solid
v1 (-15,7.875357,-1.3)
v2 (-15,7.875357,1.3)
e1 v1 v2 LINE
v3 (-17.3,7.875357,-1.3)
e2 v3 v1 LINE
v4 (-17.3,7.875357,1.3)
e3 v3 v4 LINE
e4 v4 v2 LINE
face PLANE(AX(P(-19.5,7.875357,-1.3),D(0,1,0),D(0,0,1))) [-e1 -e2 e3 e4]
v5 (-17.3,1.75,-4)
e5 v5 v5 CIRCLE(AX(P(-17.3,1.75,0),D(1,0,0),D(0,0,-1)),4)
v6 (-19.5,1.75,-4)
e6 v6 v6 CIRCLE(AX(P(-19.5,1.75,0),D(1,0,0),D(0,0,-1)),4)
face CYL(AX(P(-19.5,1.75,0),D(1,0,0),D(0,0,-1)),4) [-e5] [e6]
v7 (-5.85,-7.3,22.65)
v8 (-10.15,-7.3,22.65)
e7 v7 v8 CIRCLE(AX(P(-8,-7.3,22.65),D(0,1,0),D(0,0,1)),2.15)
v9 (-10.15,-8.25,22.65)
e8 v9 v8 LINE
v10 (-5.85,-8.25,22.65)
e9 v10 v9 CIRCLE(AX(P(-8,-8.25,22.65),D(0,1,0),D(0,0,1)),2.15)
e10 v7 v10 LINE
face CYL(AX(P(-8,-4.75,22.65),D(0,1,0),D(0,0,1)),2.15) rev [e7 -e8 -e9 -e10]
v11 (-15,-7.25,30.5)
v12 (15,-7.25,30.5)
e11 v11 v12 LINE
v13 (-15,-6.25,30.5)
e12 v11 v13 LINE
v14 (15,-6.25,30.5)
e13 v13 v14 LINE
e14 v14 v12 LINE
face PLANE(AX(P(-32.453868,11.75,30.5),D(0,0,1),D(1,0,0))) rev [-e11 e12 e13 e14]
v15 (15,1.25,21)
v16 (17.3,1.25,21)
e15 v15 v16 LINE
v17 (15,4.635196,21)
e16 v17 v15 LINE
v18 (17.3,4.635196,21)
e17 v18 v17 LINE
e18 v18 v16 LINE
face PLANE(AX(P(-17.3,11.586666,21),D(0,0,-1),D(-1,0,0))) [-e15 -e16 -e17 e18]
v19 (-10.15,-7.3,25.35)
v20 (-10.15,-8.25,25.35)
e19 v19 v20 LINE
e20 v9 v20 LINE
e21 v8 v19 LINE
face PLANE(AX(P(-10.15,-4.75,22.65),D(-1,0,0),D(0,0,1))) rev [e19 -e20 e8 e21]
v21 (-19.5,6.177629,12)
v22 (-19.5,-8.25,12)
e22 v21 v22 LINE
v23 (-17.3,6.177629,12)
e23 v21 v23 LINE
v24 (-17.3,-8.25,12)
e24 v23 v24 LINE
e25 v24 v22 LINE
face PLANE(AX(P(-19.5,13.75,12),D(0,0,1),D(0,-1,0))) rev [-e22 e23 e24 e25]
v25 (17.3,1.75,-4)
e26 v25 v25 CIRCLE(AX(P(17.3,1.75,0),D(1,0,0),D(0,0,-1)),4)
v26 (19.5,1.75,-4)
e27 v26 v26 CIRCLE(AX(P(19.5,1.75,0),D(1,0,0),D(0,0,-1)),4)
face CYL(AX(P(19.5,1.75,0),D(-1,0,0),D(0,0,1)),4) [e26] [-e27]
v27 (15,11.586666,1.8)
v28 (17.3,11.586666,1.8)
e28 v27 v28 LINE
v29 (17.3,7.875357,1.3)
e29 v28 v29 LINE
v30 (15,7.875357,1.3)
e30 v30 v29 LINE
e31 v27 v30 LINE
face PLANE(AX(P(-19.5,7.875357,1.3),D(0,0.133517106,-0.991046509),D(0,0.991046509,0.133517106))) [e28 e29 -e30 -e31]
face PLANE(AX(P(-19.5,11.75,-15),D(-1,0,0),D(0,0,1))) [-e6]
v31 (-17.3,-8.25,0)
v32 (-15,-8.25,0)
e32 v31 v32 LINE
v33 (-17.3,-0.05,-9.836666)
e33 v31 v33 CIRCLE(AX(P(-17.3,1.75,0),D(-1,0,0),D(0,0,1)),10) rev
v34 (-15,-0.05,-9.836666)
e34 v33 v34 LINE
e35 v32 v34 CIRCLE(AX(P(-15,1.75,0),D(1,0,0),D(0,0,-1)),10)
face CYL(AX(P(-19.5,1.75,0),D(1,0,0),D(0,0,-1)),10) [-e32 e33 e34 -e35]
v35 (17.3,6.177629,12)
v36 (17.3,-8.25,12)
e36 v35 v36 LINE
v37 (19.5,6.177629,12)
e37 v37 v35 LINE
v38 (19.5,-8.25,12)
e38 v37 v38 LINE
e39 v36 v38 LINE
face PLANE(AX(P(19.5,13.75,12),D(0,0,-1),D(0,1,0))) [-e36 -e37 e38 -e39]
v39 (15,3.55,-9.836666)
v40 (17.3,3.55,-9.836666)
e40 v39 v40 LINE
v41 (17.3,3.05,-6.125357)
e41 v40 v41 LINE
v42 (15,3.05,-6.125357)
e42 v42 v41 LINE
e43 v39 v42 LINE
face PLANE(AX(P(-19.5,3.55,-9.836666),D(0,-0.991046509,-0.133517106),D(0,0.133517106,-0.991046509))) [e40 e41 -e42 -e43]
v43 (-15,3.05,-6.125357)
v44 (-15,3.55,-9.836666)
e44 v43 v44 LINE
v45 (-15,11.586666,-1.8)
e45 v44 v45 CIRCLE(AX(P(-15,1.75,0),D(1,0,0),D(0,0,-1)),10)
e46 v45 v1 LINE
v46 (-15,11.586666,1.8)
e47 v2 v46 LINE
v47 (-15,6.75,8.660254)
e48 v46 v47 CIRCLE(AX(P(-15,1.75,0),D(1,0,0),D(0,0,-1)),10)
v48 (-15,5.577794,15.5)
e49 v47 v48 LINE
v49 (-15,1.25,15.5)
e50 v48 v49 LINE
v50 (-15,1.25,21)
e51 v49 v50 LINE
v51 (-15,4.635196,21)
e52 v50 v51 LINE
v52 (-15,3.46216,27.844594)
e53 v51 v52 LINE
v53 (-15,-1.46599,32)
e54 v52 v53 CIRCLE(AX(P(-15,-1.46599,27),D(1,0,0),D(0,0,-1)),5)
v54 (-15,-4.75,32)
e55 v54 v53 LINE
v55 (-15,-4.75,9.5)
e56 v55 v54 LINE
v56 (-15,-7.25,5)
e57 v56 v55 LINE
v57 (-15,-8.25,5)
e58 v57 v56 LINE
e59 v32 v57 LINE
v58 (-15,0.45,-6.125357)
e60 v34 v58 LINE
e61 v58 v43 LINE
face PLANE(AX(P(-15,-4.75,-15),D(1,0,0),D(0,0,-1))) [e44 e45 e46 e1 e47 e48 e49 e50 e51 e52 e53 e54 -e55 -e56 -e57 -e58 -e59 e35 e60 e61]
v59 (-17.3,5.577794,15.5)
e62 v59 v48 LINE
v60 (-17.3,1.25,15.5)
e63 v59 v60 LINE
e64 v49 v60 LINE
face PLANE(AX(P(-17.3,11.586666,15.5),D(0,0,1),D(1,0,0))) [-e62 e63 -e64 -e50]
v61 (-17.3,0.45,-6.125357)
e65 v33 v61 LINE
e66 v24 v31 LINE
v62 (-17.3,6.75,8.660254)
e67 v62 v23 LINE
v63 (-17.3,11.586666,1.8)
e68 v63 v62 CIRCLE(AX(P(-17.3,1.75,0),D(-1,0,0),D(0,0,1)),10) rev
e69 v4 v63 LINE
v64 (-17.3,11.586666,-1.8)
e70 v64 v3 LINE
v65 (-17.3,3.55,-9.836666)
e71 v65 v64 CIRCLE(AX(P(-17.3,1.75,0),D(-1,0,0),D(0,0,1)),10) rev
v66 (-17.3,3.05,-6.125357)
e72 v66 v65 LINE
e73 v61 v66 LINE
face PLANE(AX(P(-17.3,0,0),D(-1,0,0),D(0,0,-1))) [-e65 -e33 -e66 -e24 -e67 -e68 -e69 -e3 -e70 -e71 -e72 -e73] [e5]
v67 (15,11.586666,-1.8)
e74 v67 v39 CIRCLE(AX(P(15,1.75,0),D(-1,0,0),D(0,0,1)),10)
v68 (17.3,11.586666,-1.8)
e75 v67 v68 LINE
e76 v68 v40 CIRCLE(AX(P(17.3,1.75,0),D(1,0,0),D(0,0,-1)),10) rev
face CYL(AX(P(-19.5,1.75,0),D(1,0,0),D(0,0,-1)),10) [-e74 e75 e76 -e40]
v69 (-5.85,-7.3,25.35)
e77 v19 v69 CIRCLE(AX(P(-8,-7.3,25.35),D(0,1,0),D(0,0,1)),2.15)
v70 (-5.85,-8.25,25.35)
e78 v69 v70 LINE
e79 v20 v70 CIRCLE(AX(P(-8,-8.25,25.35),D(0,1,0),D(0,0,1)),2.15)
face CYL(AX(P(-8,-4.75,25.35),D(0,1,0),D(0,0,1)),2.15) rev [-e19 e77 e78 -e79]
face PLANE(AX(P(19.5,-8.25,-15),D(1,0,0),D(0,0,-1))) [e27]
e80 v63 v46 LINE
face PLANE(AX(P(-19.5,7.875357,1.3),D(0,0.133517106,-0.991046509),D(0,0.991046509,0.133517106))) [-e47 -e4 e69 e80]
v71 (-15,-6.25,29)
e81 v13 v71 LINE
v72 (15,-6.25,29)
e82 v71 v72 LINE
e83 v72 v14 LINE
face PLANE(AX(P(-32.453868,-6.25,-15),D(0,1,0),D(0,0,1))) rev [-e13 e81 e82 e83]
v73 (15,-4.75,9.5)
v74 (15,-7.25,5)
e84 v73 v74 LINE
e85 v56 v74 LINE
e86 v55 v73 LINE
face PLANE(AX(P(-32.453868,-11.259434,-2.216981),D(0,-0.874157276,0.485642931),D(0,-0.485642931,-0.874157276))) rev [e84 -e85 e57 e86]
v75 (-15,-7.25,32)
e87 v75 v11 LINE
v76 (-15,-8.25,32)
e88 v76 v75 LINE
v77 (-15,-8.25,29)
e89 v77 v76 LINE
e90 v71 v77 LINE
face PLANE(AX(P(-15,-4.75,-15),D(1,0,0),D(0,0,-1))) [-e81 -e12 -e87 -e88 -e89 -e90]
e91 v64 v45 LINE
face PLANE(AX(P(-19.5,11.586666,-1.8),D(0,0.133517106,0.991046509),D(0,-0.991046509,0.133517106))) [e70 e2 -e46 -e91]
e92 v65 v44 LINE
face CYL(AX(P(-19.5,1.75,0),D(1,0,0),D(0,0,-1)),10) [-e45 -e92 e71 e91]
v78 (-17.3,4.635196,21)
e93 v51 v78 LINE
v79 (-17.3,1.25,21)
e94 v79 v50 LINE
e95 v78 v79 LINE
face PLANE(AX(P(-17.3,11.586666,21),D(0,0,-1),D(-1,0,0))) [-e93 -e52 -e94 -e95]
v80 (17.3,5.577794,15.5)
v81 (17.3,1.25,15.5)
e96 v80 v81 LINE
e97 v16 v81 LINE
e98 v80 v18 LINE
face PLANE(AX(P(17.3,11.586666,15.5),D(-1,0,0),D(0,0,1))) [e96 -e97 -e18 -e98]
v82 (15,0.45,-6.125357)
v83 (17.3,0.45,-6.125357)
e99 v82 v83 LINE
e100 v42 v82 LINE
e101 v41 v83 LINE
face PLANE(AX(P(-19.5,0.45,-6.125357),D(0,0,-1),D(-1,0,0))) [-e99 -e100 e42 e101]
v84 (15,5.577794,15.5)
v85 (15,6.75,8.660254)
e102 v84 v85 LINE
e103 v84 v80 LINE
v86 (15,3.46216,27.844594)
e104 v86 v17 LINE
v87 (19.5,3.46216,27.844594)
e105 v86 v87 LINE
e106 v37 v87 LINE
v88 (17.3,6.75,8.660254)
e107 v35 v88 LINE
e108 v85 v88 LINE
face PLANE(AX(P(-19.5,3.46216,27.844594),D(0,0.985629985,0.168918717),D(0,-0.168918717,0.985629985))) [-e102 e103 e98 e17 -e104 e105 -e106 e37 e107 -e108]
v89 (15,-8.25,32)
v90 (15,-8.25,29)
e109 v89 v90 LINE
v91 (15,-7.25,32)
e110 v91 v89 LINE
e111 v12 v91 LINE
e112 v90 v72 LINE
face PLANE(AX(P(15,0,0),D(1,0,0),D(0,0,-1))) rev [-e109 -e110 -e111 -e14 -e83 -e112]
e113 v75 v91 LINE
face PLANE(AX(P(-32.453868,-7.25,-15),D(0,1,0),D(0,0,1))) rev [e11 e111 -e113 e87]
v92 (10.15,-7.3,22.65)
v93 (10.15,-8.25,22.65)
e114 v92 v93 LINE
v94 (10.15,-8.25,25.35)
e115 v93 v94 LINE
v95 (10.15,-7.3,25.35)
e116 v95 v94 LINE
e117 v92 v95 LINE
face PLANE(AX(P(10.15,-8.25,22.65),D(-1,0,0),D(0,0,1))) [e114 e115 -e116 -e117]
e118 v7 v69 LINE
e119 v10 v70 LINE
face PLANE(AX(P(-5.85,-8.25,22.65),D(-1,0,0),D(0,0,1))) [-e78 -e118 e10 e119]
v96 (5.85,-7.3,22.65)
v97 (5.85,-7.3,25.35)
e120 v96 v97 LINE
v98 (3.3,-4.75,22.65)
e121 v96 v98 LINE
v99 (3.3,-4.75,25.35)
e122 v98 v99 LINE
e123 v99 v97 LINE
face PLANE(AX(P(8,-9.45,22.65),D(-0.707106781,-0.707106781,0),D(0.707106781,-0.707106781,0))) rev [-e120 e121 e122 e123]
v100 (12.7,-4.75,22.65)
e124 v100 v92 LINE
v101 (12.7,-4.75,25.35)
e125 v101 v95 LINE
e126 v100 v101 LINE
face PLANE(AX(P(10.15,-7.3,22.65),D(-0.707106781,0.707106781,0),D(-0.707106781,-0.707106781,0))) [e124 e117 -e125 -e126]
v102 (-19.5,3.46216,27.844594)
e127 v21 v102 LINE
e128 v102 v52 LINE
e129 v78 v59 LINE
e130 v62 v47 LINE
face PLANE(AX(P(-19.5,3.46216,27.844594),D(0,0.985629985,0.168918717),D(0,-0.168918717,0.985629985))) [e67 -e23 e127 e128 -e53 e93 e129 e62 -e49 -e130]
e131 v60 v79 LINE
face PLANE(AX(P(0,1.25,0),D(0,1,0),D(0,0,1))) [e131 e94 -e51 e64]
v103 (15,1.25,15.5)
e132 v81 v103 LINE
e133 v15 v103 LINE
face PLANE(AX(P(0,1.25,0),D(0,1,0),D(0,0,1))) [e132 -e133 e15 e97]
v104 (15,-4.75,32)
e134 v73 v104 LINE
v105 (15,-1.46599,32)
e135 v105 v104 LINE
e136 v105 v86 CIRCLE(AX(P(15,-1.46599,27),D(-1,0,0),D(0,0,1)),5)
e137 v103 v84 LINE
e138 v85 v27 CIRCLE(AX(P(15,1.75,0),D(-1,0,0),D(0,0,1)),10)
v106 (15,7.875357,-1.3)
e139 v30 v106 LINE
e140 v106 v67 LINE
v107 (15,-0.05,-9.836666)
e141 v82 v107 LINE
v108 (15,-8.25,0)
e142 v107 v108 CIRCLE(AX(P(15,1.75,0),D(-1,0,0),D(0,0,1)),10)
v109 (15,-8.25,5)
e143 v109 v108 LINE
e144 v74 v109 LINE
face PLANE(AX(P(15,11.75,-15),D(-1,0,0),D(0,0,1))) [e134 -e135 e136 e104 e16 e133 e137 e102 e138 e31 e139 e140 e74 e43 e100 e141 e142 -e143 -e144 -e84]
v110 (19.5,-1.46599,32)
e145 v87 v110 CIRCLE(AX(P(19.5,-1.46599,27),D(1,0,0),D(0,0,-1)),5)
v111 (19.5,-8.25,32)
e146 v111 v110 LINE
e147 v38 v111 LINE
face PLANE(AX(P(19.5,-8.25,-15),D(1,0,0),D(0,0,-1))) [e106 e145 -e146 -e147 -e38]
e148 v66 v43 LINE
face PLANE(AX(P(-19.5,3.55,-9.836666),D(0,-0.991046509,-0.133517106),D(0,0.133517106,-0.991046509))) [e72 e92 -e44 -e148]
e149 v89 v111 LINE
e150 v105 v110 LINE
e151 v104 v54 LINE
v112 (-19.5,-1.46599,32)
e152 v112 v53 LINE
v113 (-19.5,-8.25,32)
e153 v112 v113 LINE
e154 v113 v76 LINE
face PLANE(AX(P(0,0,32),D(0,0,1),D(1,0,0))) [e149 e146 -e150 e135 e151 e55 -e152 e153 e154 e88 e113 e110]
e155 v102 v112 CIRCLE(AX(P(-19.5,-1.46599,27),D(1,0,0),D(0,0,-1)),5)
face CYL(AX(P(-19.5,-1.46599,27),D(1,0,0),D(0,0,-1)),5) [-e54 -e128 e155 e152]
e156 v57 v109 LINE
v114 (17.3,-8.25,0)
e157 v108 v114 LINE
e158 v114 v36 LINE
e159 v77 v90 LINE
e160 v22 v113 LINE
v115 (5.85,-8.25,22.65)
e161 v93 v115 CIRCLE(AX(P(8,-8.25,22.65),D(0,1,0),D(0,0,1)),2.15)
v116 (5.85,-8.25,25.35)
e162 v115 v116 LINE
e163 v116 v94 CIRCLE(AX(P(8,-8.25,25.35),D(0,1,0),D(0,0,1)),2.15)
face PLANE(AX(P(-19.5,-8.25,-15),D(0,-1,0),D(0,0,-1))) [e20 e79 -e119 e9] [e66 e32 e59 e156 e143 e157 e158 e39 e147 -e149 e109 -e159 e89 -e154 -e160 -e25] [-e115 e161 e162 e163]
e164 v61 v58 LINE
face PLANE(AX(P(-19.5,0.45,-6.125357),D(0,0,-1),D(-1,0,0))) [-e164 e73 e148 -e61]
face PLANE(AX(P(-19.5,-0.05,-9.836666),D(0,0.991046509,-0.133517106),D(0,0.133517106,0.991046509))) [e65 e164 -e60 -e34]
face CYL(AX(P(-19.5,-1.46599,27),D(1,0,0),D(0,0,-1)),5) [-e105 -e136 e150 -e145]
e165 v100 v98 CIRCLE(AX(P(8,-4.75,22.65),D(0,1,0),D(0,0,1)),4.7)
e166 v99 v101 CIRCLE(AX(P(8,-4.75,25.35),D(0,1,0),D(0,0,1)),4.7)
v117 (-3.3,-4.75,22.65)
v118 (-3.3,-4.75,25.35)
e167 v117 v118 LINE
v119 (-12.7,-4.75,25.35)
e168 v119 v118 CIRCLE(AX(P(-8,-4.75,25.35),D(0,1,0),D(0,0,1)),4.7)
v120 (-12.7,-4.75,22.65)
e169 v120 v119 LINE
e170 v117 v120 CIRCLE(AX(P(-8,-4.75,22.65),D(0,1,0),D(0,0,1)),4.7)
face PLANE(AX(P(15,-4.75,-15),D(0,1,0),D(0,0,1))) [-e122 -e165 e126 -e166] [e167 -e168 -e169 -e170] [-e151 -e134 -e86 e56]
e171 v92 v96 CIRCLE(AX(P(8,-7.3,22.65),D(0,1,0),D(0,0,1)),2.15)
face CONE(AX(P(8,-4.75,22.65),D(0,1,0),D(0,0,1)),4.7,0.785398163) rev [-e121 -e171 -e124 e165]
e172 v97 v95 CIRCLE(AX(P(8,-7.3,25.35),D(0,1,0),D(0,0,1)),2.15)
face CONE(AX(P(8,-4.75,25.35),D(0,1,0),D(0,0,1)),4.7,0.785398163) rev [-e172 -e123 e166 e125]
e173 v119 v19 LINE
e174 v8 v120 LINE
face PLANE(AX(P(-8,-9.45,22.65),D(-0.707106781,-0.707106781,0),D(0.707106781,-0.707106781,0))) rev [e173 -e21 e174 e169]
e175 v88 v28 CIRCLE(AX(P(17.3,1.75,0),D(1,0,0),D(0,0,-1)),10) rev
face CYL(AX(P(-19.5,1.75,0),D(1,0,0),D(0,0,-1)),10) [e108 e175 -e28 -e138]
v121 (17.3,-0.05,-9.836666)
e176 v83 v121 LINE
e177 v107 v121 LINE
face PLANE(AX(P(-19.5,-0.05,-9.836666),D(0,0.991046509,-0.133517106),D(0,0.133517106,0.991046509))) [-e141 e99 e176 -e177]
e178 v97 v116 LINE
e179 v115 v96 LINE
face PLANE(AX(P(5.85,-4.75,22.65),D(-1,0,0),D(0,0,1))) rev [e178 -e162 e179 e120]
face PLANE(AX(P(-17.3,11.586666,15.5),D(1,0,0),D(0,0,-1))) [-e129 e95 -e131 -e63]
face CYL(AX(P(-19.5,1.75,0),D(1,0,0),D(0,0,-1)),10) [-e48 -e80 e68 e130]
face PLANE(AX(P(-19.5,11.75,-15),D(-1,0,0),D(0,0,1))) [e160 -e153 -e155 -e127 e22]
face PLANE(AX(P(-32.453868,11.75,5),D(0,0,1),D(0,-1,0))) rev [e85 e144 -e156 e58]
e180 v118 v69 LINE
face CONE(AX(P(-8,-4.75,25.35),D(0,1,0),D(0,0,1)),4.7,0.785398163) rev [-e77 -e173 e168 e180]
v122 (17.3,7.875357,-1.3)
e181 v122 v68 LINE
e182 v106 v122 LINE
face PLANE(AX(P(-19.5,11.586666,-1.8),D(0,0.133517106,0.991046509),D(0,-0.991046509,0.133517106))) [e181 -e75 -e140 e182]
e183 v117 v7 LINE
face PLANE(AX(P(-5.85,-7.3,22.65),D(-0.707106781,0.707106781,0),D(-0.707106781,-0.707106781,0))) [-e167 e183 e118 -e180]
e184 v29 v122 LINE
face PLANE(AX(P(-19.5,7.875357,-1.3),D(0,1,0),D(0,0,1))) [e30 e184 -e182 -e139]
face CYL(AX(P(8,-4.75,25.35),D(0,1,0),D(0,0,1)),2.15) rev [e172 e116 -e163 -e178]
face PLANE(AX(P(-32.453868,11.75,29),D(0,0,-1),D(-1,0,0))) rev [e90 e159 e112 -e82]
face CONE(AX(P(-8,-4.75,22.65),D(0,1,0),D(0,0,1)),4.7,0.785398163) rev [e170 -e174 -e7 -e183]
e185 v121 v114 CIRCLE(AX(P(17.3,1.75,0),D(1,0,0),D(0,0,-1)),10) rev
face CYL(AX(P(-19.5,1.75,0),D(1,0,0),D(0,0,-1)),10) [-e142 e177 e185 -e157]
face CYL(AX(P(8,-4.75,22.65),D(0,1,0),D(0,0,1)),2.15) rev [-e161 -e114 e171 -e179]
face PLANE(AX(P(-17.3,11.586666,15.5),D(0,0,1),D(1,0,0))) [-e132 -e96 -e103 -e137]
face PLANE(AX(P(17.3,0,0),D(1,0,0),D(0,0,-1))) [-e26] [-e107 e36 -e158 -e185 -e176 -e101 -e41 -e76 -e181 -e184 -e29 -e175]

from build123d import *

# Parameters (mm, degrees)
BODY_DEPTH                                       = 32
BODY_DEPTH_BACK                                  = 15
PIVOT_START                                      = 15
PIVOT_PIN_R_SKETCH_R                             = 4
PIVOT_PIN_R_DEPTH                                = 4.25
OUTSIDE_SHAPE_CUT_OUT_DEPTH                      = 40.272286666
OUTSIDE_SHAPE_CUT_OUT_DEPTH_BACK                 = 40.272286666
OUTSIDE_SHAPE_CUT_OUT_SKETCH_W                   = 49
OUTSIDE_SHAPE_CUT_OUT_SKETCH_H                   = 22
OUTSIDE_START                                    = 17.3
OUTSIDE_SHAPE_CUT_OUT_SKETCH_R_W                 = 24
OUTSIDE_SHAPE_CUT_OUT_SKETCH_R_H                 = 24
OUTSIDE_SHAPE_CUT_OUT_SKETCH_R_R                 = 4
OUTSIDE_SHAPE_CUT_OUT_R_DEPTH                    = 22.923727913
INSIDE_START                                     = 15
INSIDE_SHAPE_CUT_OUT_DEPTH                       = 30
LIGHTENING_START                                 = 1.25
LIGHTENING_2_SKETCH_W                            = 34.6
LIGHTENING_2_SKETCH_H                            = 5.5
LIGHTENING_2_DEPTH                               = 38.973727913
F_2_START                                        = -8.25
F_2_LATERAL_SLOTS_ORIENTATED_LONGITUDINALL_DEPTH = 3.5


with BuildPart() as part:
    # Profile Sketch → Body (new, two sides: drawn at the far end of the back side and taken through both)
    with BuildSketch(Plane.XY.offset(-BODY_DEPTH_BACK)):
        Polygon((-19.5, -8.25), (19.5, -8.25), (19.5, 11.75), (15, 11.75), (15, -4.75), (-15, -4.75), (-15, 11.75), (-19.5, 11.75), align=None)
    extrude(amount=BODY_DEPTH + BODY_DEPTH_BACK)

    # Pivot Pin R Sketch → Pivot Pin R (add)
    with BuildSketch(Plane(origin=(0, 0, 0), x_dir=(0, 0, -1), z_dir=(1, 0, 0)).offset(PIVOT_START)):
        with Locations((0, 1.75)):
            Circle(PIVOT_PIN_R_SKETCH_R)
    pivot_pin_r = extrude(amount=PIVOT_PIN_R_DEPTH)

    # Pivot Pin L: Pivot Pin R across plane
    add(pivot_pin_r.mirror(Plane(origin=(0, 0, 0), x_dir=(0, 0, 1), z_dir=(1, 0, 0))))

    # Outside Shape Cut Out Sketch → Outside Shape Cut Out (cut, two sides: drawn at the far end of the back side and taken through both)
    with BuildSketch(Plane(origin=(0, 0, 0), x_dir=(0, 0, -1), z_dir=(1, 0, 0)).offset(-OUTSIDE_SHAPE_CUT_OUT_DEPTH_BACK)):
        with Locations((-9.5, 0.75)):
            Rectangle(OUTSIDE_SHAPE_CUT_OUT_SKETCH_W, OUTSIDE_SHAPE_CUT_OUT_SKETCH_H)
        with BuildLine():
            Line((-27.844593584, 3.462159665), (-8.660254038, 6.75))
            ThreePointArc((-8.660254038, 6.75), (-5.762166553, 9.922969878), (-1.8, 11.586666102))
            Line((-1.8, 11.586666102), (-1.3, 7.87535696))
            Line((-1.3, 7.87535696), (1.3, 7.87535696))
            Line((1.3, 7.87535696), (1.8, 11.586666102))
            ThreePointArc((1.8, 11.586666102), (7.071067812, 8.821067812), (9.836666102, 3.55))
            Line((9.836666102, 3.55), (6.12535696, 3.05))
            Line((6.12535696, 3.05), (6.12535696, 0.45))
            Line((6.12535696, 0.45), (9.836666102, -0.05))
            ThreePointArc((9.836666102, -0.05), (6.403124237, -5.931145748), (0, -8.25))
            Line((0, -8.25), (-32, -8.25))
            Line((-32, -8.25), (-32, -1.46599026))
            ThreePointArc((-32, -1.46599026), (-30.822497084, 1.757131835), (-27.844593584, 3.462159665))
        make_face(mode=Mode.SUBTRACT)
    extrude(amount=OUTSIDE_SHAPE_CUT_OUT_DEPTH + OUTSIDE_SHAPE_CUT_OUT_DEPTH_BACK, mode=Mode.SUBTRACT)

    # Outside Shape Cut Out Sketch R → Outside Shape Cut Out R (cut, through all)
    with BuildSketch(Plane(origin=(0, 0, 0), x_dir=(0, 0, -1), z_dir=(1, 0, 0)).offset(OUTSIDE_START)):
        with Locations((0, 1.75)):
            Rectangle(OUTSIDE_SHAPE_CUT_OUT_SKETCH_R_W, OUTSIDE_SHAPE_CUT_OUT_SKETCH_R_H)
        with Locations((0, 1.75)):
            Circle(OUTSIDE_SHAPE_CUT_OUT_SKETCH_R_R, mode=Mode.SUBTRACT)
    outside_shape_cut_out_r = extrude(amount=OUTSIDE_SHAPE_CUT_OUT_R_DEPTH, mode=Mode.SUBTRACT)

    # Outside Shape Cut Out L: Outside Shape Cut Out R across plane
    add(outside_shape_cut_out_r.mirror(Plane(origin=(0, 0, 0), x_dir=(0, 0, 1), z_dir=(1, 0, 0))), mode=Mode.SUBTRACT)

    # Inside Shape Cut Out Sketch → Inside Shape Cut Out (cut)
    with BuildSketch(Plane(origin=(0, 0, 0), x_dir=(0, 0, -1), z_dir=(1, 0, 0)).offset(INSIDE_START)):
        Polygon((-29, -6.25), (-29, -8.25), (-32, -8.25), (-32, -7.25), (-30.5, -7.25), (-30.5, -6.25), align=None)
        Polygon((-9.5, -4.75), (-5, -7.25), (-5, -8.25), (7.599342077, -8.25), (7.599342077, -4.75), align=None)
    extrude(amount=-INSIDE_SHAPE_CUT_OUT_DEPTH, mode=Mode.SUBTRACT)

    # Lightening 2 Sketch → Lightening 2 (cut, through all)
    with BuildSketch(Plane(origin=(0, 0, 0), x_dir=(1, 0, 0), z_dir=(0, 1, 0)).offset(LIGHTENING_START)):
        with Locations((0, -18.25)):
            Rectangle(LIGHTENING_2_SKETCH_W, LIGHTENING_2_SKETCH_H)
    extrude(amount=LIGHTENING_2_DEPTH, mode=Mode.SUBTRACT)

    # 2 Lateral Slots Orientated Longitudinall: read off the stored shape, not the designer's step
    # 2 Lateral Slots Orientated Longitudi 2 → 2 Lateral Slots Orientated Longitudinall (cut)
    with BuildSketch(Plane(origin=(0, 0, 0), x_dir=(1, 0, 0), z_dir=(0, 1, 0)).offset(F_2_START)):
        with BuildLine():
            Line((5.85, -22.65), (5.85, -25.35))
            ThreePointArc((5.85, -25.35), (8, -27.5), (10.15, -25.35))
            Line((10.15, -25.35), (10.15, -22.65))
            ThreePointArc((10.15, -22.65), (8, -20.5), (5.85, -22.65))
        make_face()
        with BuildLine():
            Line((-10.15, -22.65), (-10.15, -25.35))
            ThreePointArc((-10.15, -25.35), (-8, -27.5), (-5.85, -25.35))
            Line((-5.85, -25.35), (-5.85, -22.65))
            ThreePointArc((-5.85, -22.65), (-8, -20.5), (-10.15, -22.65))
        make_face()
    extrude(amount=F_2_LATERAL_SLOTS_ORIENTATED_LONGITUDINALL_DEPTH, mode=Mode.SUBTRACT)

    # 2 Lateral Slots Orientated Longitudi 3: loft between two sections, ruled curve by curve
    f_2_lateral_slots_orientated_longitudi_3_from = [
        Edge.make_three_point_arc((5.85, -7.3, 25.35), (6.47972042, -7.3, 26.87027958), (8, -7.3, 27.5)),
        Edge.make_three_point_arc((8, -7.3, 27.5), (9.52027958, -7.3, 26.87027958), (10.15, -7.3, 25.35)),
        Edge.make_three_point_arc((10.15, -7.3, 22.65), (9.52027958, -7.3, 21.12972042), (8, -7.3, 20.5)),
        Edge.make_three_point_arc((8, -7.3, 20.5), (6.47972042, -7.3, 21.12972042), (5.85, -7.3, 22.65)),
        Edge.make_line((10.15, -7.3, 25.35), (10.15, -7.3, 22.65)),
        Edge.make_line((5.85, -7.3, 25.35), (5.85, -7.3, 22.65)),
    ]
    f_2_lateral_slots_orientated_longitudi_3_to = [
        Edge.make_three_point_arc((3.3, -4.75, 25.35), (4.676598128, -4.75, 28.673401872), (8, -4.75, 30.05)),
        Edge.make_three_point_arc((8, -4.75, 30.05), (11.323401872, -4.75, 28.673401872), (12.7, -4.75, 25.35)),
        Edge.make_three_point_arc((12.7, -4.75, 22.65), (11.323401872, -4.75, 19.326598128), (8, -4.75, 17.95)),
        Edge.make_three_point_arc((8, -4.75, 17.95), (4.676598128, -4.75, 19.326598128), (3.3, -4.75, 22.65)),
        Edge.make_line((12.7, -4.75, 25.35), (12.7, -4.75, 22.65)),
        Edge.make_line((3.3, -4.75, 25.35), (3.3, -4.75, 22.65)),
    ]
    f_2_lateral_slots_orientated_longitudi_3 = Solid(Shell([*[Face.make_surface_from_curves(f_2_lateral_slots_orientated_longitudi_3_from[k], f_2_lateral_slots_orientated_longitudi_3_to[k]) for k in range(6)], Face(Wire(f_2_lateral_slots_orientated_longitudi_3_from)), Face(Wire(f_2_lateral_slots_orientated_longitudi_3_to))]))
    add(f_2_lateral_slots_orientated_longitudi_3, mode=Mode.SUBTRACT)

    # 2 Lateral Slots Orientated Longitudi 4: loft between two sections, ruled curve by curve
    f_2_lateral_slots_orientated_longitudi_4_from = [
        Edge.make_three_point_arc((-10.15, -7.3, 25.35), (-9.52027958, -7.3, 26.87027958), (-8, -7.3, 27.5)),
        Edge.make_three_point_arc((-8, -7.3, 27.5), (-6.47972042, -7.3, 26.87027958), (-5.85, -7.3, 25.35)),
        Edge.make_three_point_arc((-5.85, -7.3, 22.65), (-6.47972042, -7.3, 21.12972042), (-8, -7.3, 20.5)),
        Edge.make_three_point_arc((-8, -7.3, 20.5), (-9.52027958, -7.3, 21.12972042), (-10.15, -7.3, 22.65)),
        Edge.make_line((-5.85, -7.3, 25.35), (-5.85, -7.3, 22.65)),
        Edge.make_line((-10.15, -7.3, 25.35), (-10.15, -7.3, 22.65)),
    ]
    f_2_lateral_slots_orientated_longitudi_4_to = [
        Edge.make_three_point_arc((-12.7, -4.75, 25.35), (-11.323401872, -4.75, 28.673401872), (-8, -4.75, 30.05)),
        Edge.make_three_point_arc((-8, -4.75, 30.05), (-4.676598128, -4.75, 28.673401872), (-3.3, -4.75, 25.35)),
        Edge.make_three_point_arc((-3.3, -4.75, 22.65), (-4.676598128, -4.75, 19.326598128), (-8, -4.75, 17.95)),
        Edge.make_three_point_arc((-8, -4.75, 17.95), (-11.323401872, -4.75, 19.326598128), (-12.7, -4.75, 22.65)),
        Edge.make_line((-3.3, -4.75, 25.35), (-3.3, -4.75, 22.65)),
        Edge.make_line((-12.7, -4.75, 25.35), (-12.7, -4.75, 22.65)),
    ]
    f_2_lateral_slots_orientated_longitudi_4 = Solid(Shell([*[Face.make_surface_from_curves(f_2_lateral_slots_orientated_longitudi_4_from[k], f_2_lateral_slots_orientated_longitudi_4_to[k]) for k in range(6)], Face(Wire(f_2_lateral_slots_orientated_longitudi_4_from)), Face(Wire(f_2_lateral_slots_orientated_longitudi_4_to))]))
    add(f_2_lateral_slots_orientated_longitudi_4, mode=Mode.SUBTRACT)


solid = part.part
